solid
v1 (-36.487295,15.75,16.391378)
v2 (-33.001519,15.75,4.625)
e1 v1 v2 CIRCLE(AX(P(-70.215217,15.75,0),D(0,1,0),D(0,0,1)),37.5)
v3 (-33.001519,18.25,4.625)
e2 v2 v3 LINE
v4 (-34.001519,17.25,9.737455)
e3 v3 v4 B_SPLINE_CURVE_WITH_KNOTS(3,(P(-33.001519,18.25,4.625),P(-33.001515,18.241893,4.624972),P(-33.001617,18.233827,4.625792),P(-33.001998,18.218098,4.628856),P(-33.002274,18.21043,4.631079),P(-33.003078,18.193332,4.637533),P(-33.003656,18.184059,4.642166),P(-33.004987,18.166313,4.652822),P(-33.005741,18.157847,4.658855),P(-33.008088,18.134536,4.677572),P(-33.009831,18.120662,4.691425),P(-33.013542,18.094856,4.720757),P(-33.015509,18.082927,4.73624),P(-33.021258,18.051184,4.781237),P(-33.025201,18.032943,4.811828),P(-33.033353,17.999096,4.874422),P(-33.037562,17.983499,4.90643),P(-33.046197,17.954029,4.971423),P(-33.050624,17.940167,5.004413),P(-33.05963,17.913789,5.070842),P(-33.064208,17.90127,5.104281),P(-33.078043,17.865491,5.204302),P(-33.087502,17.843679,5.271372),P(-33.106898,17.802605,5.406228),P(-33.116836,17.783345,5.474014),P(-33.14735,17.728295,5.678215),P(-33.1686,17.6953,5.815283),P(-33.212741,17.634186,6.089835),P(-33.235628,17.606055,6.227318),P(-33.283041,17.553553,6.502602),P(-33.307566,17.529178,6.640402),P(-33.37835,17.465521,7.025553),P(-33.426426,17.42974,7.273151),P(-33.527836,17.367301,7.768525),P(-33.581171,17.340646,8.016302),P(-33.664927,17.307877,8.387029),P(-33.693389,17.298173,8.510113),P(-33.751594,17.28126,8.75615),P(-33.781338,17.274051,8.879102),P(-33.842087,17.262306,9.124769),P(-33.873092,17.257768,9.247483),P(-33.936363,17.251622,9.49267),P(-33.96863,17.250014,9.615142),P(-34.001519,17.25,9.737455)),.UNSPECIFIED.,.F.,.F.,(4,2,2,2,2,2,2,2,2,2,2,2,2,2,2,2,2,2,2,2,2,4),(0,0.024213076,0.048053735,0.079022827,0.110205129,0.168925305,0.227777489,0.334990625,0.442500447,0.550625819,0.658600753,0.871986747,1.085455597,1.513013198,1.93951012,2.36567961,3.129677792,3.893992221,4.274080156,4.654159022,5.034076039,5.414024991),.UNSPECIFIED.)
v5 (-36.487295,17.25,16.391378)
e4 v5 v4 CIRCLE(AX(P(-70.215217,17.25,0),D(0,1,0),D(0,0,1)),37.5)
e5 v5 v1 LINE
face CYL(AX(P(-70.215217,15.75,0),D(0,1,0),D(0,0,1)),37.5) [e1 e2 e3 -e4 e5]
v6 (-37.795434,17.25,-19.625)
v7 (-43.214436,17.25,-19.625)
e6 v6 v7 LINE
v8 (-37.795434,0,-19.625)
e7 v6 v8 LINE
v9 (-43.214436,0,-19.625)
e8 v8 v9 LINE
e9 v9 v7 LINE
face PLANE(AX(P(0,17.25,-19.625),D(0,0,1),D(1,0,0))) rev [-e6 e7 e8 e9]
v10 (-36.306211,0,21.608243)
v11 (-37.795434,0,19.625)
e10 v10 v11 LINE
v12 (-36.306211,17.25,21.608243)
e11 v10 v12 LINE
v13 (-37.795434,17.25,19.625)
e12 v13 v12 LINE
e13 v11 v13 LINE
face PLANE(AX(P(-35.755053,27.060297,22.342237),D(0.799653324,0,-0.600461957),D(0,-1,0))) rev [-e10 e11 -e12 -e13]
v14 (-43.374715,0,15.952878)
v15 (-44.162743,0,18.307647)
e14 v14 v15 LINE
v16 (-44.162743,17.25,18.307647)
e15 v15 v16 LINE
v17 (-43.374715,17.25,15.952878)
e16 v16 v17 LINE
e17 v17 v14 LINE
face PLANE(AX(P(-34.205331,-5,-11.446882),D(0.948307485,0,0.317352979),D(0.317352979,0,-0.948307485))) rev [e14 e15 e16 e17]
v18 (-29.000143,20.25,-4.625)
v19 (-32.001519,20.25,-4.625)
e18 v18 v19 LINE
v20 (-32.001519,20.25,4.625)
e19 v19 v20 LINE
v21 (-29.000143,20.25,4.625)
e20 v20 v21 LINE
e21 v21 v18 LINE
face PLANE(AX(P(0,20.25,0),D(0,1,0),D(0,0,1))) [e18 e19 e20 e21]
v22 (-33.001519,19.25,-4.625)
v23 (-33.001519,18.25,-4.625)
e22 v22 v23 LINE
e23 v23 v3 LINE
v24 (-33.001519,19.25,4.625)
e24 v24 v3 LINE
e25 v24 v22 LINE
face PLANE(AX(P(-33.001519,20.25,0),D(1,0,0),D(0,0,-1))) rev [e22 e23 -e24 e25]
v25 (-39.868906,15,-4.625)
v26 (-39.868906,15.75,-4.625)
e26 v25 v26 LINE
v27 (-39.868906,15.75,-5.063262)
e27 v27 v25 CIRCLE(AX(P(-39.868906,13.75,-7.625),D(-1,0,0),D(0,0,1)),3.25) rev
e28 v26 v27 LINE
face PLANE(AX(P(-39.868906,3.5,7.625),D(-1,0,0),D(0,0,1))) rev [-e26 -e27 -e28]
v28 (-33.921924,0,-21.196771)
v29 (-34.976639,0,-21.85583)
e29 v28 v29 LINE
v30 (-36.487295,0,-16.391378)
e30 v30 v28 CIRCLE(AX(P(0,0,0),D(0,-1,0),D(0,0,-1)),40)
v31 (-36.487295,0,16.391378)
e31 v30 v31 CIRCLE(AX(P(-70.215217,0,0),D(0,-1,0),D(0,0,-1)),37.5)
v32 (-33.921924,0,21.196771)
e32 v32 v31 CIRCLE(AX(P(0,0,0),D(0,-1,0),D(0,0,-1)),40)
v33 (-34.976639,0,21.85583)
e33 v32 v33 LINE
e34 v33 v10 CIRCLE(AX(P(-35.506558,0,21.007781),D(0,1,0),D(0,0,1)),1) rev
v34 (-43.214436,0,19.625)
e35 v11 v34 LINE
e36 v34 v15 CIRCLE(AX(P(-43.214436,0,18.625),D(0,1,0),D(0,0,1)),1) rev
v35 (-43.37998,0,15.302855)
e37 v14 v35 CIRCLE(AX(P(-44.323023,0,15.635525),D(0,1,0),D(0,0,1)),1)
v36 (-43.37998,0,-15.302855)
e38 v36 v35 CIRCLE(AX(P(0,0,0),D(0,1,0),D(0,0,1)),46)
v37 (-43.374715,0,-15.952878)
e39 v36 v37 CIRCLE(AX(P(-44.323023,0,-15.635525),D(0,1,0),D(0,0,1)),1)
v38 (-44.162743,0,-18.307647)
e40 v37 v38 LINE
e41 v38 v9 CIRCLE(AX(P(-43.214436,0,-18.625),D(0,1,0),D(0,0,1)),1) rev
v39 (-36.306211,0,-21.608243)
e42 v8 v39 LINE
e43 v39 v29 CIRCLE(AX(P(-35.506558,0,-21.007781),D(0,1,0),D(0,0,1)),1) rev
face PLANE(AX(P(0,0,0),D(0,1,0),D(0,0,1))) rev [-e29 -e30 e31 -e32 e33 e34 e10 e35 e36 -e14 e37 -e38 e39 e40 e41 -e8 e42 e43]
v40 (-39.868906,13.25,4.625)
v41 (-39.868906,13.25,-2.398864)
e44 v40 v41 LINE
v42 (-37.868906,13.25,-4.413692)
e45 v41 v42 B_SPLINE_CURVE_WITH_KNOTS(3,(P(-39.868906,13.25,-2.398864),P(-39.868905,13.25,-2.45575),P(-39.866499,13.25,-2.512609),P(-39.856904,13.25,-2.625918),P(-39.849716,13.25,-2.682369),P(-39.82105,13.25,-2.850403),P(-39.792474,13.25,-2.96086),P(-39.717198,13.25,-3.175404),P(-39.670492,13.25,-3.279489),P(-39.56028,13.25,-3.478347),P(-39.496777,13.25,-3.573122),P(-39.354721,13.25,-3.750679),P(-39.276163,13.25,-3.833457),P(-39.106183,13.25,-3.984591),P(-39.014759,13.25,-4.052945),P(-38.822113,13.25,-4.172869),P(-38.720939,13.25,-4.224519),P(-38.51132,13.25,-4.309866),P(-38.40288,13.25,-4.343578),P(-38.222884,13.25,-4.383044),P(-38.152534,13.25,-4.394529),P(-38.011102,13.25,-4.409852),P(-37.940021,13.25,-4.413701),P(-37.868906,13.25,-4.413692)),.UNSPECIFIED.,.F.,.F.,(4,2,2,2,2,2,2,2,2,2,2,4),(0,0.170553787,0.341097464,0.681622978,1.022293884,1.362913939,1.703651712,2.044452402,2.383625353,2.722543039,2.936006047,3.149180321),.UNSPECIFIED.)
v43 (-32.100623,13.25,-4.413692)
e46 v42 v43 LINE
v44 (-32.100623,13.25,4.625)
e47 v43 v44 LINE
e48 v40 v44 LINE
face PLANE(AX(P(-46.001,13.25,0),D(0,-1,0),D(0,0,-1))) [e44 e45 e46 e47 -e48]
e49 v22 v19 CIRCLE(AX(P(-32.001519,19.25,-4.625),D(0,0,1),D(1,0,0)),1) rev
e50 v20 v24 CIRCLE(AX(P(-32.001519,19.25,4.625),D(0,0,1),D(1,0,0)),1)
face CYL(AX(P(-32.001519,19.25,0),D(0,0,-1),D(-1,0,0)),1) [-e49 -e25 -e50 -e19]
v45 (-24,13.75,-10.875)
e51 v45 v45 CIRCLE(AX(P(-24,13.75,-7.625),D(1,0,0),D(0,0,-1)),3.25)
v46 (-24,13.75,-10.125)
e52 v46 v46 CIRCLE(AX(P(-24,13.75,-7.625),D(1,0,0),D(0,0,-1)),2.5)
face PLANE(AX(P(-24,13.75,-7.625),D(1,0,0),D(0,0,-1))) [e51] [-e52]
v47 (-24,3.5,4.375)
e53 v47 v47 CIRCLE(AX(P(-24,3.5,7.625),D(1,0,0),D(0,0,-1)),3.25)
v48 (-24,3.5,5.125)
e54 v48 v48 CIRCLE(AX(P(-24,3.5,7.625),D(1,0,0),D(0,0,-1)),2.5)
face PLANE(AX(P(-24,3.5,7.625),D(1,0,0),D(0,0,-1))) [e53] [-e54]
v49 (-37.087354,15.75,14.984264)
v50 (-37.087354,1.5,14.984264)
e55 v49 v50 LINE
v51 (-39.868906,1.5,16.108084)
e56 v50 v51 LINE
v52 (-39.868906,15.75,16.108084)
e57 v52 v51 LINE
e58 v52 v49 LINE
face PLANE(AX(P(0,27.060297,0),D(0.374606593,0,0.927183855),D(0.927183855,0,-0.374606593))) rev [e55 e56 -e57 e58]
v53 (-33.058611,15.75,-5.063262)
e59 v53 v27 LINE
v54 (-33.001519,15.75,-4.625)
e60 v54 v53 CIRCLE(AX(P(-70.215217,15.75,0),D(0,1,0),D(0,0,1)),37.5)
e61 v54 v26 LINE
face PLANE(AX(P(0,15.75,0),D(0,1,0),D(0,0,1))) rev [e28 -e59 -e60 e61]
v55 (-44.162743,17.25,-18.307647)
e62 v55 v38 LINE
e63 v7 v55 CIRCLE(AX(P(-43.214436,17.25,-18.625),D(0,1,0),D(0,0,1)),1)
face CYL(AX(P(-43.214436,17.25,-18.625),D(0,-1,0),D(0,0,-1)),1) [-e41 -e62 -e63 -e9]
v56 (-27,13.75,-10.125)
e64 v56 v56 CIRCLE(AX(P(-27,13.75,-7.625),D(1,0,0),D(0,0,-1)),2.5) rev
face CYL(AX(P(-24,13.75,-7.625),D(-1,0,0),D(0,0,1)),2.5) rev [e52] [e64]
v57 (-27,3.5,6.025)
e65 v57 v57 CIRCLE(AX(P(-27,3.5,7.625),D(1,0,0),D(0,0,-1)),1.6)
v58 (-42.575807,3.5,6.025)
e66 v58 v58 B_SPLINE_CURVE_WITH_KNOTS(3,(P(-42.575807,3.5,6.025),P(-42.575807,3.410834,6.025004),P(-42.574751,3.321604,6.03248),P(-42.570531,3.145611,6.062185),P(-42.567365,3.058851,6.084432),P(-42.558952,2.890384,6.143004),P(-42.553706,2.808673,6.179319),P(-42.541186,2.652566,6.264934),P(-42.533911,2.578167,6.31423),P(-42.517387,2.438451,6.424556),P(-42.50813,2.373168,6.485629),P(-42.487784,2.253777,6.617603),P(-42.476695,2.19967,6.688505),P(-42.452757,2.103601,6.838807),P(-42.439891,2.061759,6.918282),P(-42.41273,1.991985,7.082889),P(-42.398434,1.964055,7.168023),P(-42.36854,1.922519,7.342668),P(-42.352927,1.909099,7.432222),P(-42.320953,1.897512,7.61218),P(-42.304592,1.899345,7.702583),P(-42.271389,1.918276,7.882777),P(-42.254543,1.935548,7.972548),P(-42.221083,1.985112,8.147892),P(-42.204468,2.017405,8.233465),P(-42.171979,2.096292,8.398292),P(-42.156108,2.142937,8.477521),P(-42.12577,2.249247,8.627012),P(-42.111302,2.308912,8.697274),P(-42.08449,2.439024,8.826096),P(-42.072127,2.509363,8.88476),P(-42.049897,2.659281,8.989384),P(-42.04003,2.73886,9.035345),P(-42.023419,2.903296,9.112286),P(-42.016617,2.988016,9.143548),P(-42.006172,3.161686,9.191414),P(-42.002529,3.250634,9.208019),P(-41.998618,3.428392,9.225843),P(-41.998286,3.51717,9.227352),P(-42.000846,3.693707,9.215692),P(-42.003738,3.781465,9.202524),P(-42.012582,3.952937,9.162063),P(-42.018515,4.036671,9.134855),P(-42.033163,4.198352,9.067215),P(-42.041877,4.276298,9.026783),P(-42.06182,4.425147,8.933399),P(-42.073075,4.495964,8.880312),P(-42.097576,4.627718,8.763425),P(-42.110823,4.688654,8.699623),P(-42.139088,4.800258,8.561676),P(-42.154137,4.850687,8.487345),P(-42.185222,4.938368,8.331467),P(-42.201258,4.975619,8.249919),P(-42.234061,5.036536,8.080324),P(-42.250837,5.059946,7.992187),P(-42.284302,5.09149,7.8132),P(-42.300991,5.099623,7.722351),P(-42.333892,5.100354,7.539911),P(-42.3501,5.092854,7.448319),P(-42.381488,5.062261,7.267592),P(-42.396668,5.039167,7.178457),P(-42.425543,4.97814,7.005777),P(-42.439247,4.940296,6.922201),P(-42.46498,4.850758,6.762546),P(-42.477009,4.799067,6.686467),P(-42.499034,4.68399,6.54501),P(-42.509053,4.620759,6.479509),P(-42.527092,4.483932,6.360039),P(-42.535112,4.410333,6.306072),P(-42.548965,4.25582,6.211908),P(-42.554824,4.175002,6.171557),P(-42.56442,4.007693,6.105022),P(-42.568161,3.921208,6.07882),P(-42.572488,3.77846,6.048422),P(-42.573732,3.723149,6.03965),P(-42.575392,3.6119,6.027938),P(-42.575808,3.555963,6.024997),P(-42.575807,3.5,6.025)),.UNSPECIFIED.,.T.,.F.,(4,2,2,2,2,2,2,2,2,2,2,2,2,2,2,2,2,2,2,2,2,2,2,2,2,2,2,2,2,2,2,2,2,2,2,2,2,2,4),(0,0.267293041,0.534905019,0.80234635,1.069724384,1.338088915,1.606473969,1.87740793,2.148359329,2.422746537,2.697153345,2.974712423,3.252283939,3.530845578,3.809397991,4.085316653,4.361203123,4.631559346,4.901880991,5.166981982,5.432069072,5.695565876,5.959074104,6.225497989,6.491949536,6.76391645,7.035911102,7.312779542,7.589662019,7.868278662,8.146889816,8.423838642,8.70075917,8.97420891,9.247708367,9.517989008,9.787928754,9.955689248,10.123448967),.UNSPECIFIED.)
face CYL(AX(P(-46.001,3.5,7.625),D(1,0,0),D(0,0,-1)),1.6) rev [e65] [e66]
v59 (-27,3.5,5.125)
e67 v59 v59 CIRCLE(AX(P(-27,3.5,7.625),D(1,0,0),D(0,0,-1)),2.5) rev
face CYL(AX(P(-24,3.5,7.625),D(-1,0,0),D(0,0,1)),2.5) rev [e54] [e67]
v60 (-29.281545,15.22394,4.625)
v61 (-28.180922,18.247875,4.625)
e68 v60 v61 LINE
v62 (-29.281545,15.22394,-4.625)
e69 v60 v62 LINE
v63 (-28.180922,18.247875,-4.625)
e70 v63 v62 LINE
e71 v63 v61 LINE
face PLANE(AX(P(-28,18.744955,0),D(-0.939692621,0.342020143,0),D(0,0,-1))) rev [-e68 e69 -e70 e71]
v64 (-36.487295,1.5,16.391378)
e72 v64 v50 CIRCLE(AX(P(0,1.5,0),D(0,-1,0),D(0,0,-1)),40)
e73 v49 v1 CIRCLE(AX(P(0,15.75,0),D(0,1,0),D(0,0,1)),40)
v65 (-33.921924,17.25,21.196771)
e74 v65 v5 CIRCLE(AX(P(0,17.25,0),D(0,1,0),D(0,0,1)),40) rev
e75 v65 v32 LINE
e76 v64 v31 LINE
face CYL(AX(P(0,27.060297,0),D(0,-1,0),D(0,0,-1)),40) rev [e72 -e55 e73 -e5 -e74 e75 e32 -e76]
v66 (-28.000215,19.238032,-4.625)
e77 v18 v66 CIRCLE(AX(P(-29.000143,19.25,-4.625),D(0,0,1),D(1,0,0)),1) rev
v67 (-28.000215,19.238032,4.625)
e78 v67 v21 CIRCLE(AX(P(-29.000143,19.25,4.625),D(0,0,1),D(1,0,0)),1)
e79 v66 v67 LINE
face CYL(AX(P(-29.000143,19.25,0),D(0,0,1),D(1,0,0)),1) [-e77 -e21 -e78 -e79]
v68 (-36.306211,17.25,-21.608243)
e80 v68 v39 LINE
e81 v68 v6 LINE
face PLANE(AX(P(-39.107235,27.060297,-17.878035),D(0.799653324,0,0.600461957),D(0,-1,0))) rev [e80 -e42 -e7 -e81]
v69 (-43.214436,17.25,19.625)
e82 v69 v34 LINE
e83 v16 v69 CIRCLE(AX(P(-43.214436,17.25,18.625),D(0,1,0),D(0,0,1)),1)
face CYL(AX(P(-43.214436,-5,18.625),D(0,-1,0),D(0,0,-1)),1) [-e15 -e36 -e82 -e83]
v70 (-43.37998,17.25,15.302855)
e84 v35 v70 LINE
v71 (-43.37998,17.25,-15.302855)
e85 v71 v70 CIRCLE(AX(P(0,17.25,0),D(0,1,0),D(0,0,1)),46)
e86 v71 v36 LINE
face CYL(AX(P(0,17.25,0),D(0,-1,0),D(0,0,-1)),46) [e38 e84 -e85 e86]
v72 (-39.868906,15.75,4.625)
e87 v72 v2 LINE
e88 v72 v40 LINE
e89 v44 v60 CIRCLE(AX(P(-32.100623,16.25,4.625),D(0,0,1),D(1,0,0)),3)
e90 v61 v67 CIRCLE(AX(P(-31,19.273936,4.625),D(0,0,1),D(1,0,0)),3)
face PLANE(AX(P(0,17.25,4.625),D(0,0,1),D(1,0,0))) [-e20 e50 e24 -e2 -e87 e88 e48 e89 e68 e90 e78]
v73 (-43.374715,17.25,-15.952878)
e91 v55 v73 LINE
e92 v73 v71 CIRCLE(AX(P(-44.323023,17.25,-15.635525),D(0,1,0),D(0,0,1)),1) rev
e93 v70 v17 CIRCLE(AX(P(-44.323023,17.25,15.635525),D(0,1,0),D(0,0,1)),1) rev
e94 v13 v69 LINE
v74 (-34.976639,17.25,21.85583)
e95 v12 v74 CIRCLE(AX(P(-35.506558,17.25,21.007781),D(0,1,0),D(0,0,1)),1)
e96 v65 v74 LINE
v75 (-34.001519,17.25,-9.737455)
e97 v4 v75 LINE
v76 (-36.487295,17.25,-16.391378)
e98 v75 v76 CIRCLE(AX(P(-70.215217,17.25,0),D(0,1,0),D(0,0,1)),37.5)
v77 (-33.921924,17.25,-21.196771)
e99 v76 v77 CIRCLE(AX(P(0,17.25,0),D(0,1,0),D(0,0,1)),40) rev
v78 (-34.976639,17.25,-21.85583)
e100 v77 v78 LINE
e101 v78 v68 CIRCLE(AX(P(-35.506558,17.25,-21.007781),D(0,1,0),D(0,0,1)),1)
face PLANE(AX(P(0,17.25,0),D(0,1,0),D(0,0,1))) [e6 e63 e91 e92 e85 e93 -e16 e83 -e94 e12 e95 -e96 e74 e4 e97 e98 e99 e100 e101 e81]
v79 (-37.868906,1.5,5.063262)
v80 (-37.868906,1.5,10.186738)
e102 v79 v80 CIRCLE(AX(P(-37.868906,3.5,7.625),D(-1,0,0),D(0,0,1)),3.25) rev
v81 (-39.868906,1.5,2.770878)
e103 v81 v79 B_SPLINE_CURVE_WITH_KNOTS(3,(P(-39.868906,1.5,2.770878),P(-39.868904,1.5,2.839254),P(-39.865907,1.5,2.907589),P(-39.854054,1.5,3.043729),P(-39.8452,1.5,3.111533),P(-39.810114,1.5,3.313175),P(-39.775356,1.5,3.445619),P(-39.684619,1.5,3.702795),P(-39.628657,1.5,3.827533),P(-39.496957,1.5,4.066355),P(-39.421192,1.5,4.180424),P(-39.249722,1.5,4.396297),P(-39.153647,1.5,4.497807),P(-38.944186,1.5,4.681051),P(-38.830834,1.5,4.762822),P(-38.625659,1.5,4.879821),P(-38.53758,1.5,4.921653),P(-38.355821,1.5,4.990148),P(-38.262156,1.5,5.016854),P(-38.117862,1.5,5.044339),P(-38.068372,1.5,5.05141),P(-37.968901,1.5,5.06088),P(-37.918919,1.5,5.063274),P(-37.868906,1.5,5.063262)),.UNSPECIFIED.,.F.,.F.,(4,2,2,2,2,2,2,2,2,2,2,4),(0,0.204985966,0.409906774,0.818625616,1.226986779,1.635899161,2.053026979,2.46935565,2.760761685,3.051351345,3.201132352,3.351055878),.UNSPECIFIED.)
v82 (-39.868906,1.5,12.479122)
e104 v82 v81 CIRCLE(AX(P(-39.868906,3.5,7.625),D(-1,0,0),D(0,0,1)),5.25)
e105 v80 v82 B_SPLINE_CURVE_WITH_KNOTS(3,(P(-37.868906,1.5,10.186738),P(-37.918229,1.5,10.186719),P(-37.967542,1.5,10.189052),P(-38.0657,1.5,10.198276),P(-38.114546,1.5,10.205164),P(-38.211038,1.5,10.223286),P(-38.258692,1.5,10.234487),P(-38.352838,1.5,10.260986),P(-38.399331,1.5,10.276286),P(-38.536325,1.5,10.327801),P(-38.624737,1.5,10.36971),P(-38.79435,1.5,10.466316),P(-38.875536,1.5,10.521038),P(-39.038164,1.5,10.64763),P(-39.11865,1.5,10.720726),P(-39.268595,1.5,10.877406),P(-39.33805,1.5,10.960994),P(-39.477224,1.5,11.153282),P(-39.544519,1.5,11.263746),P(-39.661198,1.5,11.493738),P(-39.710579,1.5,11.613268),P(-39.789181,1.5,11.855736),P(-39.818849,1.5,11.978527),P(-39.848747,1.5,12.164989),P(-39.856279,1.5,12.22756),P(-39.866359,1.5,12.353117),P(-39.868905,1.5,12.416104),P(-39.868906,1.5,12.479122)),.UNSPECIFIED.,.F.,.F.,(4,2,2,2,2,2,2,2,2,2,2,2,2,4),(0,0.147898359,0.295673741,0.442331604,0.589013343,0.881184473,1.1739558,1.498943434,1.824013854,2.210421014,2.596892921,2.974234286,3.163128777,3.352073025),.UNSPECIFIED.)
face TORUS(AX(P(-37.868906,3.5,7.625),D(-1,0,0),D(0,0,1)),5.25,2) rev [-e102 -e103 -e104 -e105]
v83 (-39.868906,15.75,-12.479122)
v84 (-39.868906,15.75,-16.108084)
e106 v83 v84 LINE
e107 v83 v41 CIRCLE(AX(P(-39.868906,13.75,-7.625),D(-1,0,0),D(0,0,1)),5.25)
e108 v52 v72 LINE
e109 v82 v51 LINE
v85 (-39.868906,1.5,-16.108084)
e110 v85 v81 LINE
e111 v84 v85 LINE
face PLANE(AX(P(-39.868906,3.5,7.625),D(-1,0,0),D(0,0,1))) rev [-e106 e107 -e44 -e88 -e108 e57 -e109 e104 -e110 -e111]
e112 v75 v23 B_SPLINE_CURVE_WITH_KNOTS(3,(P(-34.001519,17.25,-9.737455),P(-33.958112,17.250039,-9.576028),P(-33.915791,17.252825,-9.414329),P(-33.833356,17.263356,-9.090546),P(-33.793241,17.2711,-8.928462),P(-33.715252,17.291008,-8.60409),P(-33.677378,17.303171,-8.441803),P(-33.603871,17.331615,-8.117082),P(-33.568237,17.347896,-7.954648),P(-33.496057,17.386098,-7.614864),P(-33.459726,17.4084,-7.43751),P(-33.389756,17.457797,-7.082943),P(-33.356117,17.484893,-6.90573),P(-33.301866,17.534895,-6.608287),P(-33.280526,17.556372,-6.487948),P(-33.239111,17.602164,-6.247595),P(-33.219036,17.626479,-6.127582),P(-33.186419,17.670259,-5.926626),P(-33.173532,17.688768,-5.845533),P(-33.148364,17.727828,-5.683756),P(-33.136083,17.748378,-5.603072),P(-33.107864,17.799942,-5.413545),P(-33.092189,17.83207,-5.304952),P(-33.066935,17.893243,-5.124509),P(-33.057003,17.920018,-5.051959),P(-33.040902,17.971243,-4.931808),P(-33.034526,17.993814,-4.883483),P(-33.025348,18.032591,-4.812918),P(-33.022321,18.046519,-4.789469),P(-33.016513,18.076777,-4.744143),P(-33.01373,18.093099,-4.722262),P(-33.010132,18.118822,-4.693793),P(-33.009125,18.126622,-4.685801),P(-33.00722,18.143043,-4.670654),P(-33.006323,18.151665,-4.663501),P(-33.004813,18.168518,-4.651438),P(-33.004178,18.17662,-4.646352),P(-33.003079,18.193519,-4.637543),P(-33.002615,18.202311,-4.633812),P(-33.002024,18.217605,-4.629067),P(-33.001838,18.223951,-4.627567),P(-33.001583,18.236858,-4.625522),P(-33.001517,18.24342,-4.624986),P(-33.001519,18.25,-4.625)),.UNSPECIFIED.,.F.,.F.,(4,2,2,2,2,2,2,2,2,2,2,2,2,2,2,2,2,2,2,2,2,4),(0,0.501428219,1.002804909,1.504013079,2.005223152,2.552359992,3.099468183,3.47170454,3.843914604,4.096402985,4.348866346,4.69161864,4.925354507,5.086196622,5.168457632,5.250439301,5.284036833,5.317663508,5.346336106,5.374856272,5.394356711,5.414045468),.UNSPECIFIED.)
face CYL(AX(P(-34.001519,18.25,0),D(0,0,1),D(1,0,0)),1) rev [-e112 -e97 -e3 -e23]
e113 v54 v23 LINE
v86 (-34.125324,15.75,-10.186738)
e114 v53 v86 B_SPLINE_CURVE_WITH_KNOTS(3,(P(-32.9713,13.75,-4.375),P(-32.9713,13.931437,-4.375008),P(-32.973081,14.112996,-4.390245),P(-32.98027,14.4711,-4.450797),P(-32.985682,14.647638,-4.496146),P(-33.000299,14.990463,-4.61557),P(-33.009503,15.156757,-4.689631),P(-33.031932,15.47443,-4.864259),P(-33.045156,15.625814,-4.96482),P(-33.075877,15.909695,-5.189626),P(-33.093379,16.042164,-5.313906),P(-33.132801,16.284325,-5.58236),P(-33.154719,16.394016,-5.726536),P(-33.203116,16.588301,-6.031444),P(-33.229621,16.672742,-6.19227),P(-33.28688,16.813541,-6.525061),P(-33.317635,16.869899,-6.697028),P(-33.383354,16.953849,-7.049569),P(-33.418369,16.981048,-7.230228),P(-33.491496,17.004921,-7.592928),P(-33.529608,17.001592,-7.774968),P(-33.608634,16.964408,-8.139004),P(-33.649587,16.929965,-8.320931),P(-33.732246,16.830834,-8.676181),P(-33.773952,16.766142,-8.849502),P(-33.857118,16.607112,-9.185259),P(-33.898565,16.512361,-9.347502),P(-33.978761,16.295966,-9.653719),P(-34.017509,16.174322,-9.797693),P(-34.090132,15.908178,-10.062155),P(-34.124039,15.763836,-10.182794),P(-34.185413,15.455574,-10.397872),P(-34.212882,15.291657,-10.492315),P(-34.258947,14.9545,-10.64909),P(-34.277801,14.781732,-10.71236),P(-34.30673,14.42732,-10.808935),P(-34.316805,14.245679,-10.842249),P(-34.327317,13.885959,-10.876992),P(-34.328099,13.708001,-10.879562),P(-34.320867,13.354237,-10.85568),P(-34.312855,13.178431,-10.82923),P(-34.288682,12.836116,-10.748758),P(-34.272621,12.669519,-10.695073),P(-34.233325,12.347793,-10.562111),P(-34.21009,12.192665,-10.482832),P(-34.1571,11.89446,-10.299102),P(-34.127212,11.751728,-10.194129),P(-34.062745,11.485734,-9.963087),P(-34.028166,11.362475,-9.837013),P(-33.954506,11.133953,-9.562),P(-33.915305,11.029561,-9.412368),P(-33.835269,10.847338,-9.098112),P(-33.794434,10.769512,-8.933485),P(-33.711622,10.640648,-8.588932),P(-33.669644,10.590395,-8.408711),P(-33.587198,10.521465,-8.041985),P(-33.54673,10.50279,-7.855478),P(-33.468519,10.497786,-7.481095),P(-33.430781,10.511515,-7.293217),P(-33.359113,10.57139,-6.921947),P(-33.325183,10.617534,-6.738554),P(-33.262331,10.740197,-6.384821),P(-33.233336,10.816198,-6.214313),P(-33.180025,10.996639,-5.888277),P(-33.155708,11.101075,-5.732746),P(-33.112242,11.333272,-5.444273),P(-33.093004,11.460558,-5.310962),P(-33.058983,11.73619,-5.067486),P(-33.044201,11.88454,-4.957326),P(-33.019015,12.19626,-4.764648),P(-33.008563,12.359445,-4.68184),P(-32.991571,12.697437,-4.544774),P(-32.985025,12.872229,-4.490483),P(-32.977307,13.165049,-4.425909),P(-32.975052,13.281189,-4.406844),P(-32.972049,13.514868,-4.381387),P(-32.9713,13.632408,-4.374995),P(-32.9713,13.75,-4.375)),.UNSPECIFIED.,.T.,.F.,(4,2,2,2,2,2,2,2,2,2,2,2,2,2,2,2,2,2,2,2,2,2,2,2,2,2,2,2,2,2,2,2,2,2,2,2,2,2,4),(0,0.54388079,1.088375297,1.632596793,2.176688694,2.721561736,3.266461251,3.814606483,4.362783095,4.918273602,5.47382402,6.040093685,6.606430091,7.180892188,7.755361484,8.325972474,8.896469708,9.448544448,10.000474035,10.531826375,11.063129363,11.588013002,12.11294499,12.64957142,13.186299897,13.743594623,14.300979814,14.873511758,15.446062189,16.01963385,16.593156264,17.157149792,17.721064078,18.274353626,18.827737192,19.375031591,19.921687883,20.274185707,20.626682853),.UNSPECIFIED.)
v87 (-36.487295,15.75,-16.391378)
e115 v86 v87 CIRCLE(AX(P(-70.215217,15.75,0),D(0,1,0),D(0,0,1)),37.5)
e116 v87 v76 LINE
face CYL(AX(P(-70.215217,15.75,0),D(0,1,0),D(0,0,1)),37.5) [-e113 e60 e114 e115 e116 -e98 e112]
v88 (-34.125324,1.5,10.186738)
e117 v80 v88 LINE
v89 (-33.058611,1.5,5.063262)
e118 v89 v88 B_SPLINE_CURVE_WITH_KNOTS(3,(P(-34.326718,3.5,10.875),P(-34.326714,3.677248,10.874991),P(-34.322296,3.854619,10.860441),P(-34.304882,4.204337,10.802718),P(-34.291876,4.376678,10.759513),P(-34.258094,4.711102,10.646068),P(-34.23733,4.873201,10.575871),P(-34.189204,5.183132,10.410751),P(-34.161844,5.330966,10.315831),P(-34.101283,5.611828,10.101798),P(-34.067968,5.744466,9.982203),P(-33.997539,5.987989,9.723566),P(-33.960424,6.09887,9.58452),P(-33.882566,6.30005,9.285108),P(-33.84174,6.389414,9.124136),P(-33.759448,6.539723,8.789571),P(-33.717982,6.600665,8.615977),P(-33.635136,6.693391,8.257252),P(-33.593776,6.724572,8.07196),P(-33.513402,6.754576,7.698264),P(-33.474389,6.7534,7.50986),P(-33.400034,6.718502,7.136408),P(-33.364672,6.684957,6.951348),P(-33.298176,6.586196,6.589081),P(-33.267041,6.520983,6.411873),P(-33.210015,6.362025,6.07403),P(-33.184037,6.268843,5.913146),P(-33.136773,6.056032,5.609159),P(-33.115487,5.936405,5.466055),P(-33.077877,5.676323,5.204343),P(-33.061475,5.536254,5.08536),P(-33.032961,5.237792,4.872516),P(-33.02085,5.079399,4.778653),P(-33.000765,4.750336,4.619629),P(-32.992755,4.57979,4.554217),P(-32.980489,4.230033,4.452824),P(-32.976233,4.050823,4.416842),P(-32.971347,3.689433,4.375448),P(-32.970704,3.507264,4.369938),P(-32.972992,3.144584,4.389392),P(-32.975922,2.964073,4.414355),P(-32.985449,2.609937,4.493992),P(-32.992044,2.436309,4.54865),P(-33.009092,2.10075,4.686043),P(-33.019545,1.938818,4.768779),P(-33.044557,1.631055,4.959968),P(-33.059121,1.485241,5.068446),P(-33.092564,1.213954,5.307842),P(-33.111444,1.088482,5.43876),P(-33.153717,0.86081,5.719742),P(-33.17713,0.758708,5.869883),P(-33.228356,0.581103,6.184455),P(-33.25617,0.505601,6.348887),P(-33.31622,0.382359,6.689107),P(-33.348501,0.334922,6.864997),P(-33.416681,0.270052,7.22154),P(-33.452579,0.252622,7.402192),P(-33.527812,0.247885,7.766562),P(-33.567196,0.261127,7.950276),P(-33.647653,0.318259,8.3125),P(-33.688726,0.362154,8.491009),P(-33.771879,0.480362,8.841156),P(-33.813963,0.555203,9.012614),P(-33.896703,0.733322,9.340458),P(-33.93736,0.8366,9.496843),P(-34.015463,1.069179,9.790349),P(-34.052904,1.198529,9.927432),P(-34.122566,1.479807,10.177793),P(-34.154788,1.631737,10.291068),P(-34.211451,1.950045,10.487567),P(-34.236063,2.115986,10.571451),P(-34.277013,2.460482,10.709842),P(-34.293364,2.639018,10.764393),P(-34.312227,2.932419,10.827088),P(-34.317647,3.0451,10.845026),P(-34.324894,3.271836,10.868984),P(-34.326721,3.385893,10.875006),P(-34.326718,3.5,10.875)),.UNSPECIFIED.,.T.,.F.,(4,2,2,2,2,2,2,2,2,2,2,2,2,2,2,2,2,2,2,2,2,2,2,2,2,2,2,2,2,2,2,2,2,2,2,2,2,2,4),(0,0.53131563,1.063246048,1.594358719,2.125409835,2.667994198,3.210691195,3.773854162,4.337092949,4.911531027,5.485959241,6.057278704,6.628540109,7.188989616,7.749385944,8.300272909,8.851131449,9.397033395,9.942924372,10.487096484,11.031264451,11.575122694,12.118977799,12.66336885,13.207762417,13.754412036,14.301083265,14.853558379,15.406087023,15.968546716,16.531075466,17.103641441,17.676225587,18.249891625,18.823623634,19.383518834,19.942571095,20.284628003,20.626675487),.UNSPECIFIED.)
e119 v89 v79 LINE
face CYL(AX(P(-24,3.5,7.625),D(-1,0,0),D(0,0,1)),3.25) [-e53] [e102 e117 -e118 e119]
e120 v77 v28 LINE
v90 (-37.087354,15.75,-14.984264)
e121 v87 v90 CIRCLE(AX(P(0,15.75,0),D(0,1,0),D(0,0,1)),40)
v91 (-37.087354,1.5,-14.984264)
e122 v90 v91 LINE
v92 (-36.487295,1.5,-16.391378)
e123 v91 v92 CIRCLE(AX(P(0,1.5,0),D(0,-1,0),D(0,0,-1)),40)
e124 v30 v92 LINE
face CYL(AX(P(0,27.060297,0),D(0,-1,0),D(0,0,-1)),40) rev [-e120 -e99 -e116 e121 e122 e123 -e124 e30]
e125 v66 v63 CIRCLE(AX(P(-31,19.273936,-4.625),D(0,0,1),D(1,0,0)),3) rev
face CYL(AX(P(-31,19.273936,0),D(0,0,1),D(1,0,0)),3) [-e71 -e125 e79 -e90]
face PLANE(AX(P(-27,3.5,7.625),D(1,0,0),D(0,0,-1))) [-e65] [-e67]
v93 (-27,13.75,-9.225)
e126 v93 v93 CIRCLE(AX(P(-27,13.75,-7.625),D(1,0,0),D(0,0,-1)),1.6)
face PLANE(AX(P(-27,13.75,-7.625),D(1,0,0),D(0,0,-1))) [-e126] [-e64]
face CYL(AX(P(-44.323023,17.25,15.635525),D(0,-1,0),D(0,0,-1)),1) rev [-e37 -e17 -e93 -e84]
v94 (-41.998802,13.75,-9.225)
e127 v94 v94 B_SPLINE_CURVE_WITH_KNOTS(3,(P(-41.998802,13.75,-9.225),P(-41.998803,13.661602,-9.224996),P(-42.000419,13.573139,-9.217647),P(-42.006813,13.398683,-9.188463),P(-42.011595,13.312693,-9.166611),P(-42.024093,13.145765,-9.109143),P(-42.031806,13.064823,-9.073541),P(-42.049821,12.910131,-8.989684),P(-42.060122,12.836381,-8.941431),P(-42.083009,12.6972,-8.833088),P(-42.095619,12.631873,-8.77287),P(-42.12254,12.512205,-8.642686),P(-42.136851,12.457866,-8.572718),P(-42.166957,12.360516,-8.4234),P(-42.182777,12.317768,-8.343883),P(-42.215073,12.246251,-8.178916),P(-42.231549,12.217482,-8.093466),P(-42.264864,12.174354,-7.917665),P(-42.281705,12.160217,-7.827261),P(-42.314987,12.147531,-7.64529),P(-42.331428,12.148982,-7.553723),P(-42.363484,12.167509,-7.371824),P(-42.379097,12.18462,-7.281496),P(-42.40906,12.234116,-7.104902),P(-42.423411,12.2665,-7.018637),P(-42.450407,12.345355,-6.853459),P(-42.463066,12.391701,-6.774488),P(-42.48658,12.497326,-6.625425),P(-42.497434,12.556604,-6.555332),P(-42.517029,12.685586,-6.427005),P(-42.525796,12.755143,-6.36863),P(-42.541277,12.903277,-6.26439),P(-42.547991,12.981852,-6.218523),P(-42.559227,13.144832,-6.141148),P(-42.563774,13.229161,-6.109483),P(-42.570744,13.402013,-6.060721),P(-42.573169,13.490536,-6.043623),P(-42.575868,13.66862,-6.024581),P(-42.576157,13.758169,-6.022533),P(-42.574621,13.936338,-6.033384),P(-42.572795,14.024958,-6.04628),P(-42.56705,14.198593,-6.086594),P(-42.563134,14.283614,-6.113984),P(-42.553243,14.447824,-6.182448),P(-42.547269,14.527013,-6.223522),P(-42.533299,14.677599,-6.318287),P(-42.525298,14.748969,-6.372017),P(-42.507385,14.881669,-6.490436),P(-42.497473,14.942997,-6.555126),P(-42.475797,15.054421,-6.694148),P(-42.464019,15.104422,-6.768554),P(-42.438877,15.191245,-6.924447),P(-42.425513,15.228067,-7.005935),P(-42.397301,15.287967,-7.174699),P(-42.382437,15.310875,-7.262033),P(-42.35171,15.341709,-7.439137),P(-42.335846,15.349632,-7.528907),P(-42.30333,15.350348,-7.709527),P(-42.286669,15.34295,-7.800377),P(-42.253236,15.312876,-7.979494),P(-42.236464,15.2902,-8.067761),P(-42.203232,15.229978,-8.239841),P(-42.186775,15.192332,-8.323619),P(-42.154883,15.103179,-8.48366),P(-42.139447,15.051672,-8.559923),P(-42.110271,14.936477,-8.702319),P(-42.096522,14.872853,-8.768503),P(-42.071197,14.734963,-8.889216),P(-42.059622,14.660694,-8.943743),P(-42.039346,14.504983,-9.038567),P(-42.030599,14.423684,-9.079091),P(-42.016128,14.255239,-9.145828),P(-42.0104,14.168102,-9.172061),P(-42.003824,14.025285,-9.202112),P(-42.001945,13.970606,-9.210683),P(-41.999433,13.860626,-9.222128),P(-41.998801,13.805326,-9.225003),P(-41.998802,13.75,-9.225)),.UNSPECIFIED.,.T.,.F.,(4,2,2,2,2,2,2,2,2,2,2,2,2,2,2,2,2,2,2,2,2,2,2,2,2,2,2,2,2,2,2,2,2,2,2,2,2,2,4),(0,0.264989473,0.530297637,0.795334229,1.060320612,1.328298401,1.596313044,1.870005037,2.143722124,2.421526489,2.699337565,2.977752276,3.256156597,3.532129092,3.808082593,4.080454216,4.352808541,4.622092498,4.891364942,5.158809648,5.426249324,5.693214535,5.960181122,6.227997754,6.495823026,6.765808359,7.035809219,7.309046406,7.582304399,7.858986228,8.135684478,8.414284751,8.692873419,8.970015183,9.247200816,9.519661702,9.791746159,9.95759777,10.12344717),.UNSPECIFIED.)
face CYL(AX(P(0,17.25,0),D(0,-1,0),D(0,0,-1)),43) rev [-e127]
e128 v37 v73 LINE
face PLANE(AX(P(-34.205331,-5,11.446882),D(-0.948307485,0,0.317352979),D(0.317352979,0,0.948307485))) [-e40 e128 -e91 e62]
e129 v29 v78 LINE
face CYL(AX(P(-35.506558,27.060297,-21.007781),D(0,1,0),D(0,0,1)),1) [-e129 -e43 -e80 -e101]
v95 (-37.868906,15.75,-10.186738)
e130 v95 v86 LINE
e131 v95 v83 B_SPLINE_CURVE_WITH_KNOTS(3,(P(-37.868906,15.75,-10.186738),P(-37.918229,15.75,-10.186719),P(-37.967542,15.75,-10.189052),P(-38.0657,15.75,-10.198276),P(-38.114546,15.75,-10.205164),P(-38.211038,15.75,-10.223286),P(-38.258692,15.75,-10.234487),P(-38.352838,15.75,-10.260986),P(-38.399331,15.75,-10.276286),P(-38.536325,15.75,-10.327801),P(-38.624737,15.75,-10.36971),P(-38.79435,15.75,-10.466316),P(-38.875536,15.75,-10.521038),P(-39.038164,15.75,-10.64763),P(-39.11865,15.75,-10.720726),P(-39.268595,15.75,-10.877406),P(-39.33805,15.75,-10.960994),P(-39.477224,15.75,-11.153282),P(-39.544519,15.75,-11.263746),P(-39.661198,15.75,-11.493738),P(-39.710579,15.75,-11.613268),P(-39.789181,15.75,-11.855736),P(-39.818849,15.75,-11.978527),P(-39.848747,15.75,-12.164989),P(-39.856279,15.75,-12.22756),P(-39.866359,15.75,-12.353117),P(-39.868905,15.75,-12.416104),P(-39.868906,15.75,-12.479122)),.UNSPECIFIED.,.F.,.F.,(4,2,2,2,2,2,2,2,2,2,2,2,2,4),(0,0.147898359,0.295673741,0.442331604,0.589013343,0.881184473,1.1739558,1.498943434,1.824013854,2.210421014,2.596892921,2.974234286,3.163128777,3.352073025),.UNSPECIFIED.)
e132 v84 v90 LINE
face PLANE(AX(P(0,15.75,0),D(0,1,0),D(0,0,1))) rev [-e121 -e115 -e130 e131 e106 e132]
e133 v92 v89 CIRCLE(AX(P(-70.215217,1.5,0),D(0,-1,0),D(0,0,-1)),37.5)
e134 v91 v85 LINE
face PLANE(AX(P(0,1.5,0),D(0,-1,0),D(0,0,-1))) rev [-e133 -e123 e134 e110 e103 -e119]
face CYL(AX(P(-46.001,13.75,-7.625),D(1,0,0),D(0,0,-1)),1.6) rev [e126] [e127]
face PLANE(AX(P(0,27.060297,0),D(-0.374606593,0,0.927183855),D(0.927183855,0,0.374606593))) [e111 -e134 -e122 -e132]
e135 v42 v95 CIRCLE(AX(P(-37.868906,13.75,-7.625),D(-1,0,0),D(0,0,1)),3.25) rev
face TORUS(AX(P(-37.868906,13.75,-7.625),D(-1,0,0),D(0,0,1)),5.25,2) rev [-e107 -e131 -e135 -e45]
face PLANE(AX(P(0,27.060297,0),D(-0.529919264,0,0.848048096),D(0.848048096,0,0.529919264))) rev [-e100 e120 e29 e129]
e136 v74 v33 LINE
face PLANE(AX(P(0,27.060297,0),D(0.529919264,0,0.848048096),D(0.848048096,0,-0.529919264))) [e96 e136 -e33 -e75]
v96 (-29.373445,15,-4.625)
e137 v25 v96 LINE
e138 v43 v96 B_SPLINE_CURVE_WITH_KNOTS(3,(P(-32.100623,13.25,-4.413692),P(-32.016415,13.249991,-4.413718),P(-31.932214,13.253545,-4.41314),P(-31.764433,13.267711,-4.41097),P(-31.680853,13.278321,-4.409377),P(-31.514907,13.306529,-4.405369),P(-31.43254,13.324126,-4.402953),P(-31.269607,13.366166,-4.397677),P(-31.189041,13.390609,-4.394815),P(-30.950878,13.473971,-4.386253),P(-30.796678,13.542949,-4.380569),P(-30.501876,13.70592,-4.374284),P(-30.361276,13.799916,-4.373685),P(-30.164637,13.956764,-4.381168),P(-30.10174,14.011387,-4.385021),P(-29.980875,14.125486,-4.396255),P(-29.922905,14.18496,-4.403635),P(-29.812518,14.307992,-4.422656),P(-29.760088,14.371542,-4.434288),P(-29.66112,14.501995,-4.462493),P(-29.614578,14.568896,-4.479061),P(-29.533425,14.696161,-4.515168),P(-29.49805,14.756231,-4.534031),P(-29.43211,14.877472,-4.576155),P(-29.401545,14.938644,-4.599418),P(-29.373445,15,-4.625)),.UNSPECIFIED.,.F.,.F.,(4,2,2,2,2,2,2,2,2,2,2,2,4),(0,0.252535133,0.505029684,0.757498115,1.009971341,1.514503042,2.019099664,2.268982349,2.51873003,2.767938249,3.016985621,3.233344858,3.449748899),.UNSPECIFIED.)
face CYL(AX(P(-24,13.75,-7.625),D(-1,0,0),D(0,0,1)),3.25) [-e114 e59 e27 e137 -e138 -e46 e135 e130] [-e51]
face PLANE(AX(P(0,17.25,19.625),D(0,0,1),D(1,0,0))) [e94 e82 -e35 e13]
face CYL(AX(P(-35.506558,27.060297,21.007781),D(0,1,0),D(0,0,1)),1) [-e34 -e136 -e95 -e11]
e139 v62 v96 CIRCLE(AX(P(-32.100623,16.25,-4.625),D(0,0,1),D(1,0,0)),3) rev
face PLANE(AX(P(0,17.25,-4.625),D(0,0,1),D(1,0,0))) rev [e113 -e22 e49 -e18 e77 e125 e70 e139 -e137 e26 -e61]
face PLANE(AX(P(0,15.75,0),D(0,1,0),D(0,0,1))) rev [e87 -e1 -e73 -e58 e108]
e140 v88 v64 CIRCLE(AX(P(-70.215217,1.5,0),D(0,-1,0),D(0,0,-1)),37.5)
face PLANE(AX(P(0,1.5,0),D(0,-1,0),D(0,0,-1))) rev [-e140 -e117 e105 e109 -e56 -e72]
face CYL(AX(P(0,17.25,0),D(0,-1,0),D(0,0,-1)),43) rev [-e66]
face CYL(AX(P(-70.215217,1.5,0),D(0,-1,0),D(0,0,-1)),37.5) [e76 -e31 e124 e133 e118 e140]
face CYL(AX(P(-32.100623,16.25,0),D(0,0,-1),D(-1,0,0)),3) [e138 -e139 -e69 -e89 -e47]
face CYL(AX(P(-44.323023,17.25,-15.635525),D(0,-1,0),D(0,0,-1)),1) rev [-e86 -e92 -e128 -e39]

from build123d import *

# Parameters (mm, degrees)
BOSS_EXTRUDE1_DEPTH              = 17.25
CUT_EXTRUDE1_REACH               = 33.729
CUT_EXTRUDE1_END_RADIUS          = 43
SKETCH2_W                        = 9.25
SKETCH2_H                        = 13.25
BOSS_EXTRUDE2_REACH              = 33.729
BOSS_EXTRUDE2_END_RADIUS         = 43
SKETCH4_R                        = 2.5
SKETCH4_R_2                      = 1.6
BOSS_EXTRUDE3_DEPTH              = 1.5
BOSS_EXTRUDE4_START              = -1.5
BOSS_EXTRUDE4_DEPTH              = 1.5
SKETCH9_W                        = 5.001518559
SKETCH9_H                        = 9.25
BOSS_EXTRUDE5_DEPTH              = 3
CHAMFER1_SIZE                    = 2
CHAMFER1_SIZE2                   = 5.494954839
FILLET1_R                        = 3
FILLET2_R                        = 1
FILLET3_R                        = 1
BOSS_EXTRUDE8_REACH              = 55.956
CHAMFER2_START                   = -1
CHAMFER2_DEPTH                   = 19
FILLET5_R                        = 1
BOSS_EXTRUDE9_REACH              = 34.176
BOSS_EXTRUDE10_START             = 1
SKETCH15_R                       = 2.5
SKETCH15_R_2                     = 1.6
BOSS_EXTRUDE10_DEPTH             = 1
BOSS_EXTRUDE11_REACH             = 37.432
SKETCH16_R                       = 3.25
SKETCH16_R_2                     = 2.5
BOSS_EXTRUDE11_DIRECTION_2_DEPTH = 3
FILLET6_R                        = 2
BOSS_EXTRUDE12_START             = -17.25
BOSS_EXTRUDE12_DEPTH             = 17.25
FILLET7_R                        = 1


with BuildPart() as part:
    # Sketch1 → Boss-Extrude1 (new body)
    with BuildSketch(Plane(origin=(0, 0, 0), x_dir=(1, 0, 0), z_dir=(0, 1, 0))):
        with BuildLine():
            ThreePointArc((-42.750548242, 4.625), (-41.193980767, 12.331096812), (-38.260415249, 19.625))
            Line((-38.260415249, 19.625), (-41.603598102, 19.625))
            ThreePointArc((-41.603598102, 19.625), (-46, 0), (-41.603598102, -19.625))
            Line((-41.603598102, -19.625), (-38.260415249, -19.625))
            ThreePointArc((-38.260415249, -19.625), (-41.193980767, -12.331096812), (-42.750548242, -4.625))
            Line((-42.750548242, -4.625), (-28, -4.625))
            Line((-28, -4.625), (-28, 4.625))
            Line((-28, 4.625), (-42.750548242, 4.625))
        make_face()
    extrude(amount=BOSS_EXTRUDE1_DEPTH)

    # Cut-Extrude1: up to this cylinder (the profile starts inside it)
    cut_extrude1_end = Plane(origin=(0, 6.625, 0), z_dir=(0, -1, 0)) * Cylinder(CUT_EXTRUDE1_END_RADIUS, 154.458, mode=Mode.PRIVATE)
    # Sketch2 → Cut-Extrude1 (cut, up to the surface)
    with BuildSketch(Plane(origin=(-28, 0, 0), x_dir=(0, 0, -1), z_dir=(1, 0, 0)), mode=Mode.PRIVATE) as cut_extrude1_sk1:
        with Locations((0, 6.625)):
            Rectangle(SKETCH2_W, SKETCH2_H)
    cut_extrude1_tool1 = extrude(cut_extrude1_sk1.sketch, amount=-CUT_EXTRUDE1_REACH, mode=Mode.PRIVATE) & cut_extrude1_end
    add(cut_extrude1_tool1.solids().sort_by_distance((-28, 6.625, 0))[0], mode=Mode.SUBTRACT)

    # Boss-Extrude2: up to this cylinder (the profile starts inside it)
    boss_extrude2_end = Plane(origin=(0, 8.625, 0), z_dir=(0, -1, 0)) * Cylinder(BOSS_EXTRUDE2_END_RADIUS, 164.708, mode=Mode.PRIVATE)
    # Sketch4 → Boss-Extrude2 (add, up to the surface)
    with BuildSketch(Plane(origin=(-28, 0, 0), x_dir=(0, 0, -1), z_dir=(1, 0, 0)), mode=Mode.PRIVATE) as boss_extrude2_sk1:
        with Locations((-7.625, 3.5)):
            Circle(SKETCH4_R)
        with Locations((-7.625, 3.5)):
            Circle(SKETCH4_R_2, mode=Mode.SUBTRACT)
    boss_extrude2_tool1 = extrude(boss_extrude2_sk1.sketch, amount=-BOSS_EXTRUDE2_REACH, mode=Mode.PRIVATE) & boss_extrude2_end
    add(boss_extrude2_tool1.solids().sort_by_distance((-28, 3.5, 10.054289))[0])
    # Sketch4 → Boss-Extrude2 (add, up to the surface)
    with BuildSketch(Plane(origin=(-28, 0, 0), x_dir=(0, 0, -1), z_dir=(1, 0, 0)), mode=Mode.PRIVATE) as boss_extrude2_sk2:
        with Locations((7.625, 13.75)):
            Circle(SKETCH4_R)
        with Locations((7.625, 13.75)):
            Circle(SKETCH4_R_2, mode=Mode.SUBTRACT)
    boss_extrude2_tool2 = extrude(boss_extrude2_sk2.sketch, amount=-BOSS_EXTRUDE2_REACH, mode=Mode.PRIVATE) & boss_extrude2_end
    add(boss_extrude2_tool2.solids().sort_by_distance((-28, 13.75, -5.195711))[0])

    # Sketch7 → Boss-Extrude3 (add)
    with BuildSketch(Plane.XZ):
        with BuildLine():
            ThreePointArc((-38.260415249, 19.625), (-43, 0), (-38.260415249, -19.625))
            ThreePointArc((-38.260415249, -19.625), (-34.128134601, -10.196688741), (-32.715217313, 0))
            ThreePointArc((-32.715217313, 0), (-34.128134601, 10.196688741), (-38.260415249, 19.625))
        make_face()
    extrude(amount=-BOSS_EXTRUDE3_DEPTH)

    # Sketch8 → Boss-Extrude4 (add)
    with BuildSketch(Plane(origin=(0, 17.25, 0), x_dir=(1, 0, 0), z_dir=(0, 1, 0)).offset(BOSS_EXTRUDE4_START)):
        with BuildLine():
            Line((-42.750548242, 4.625), (-33.001518559, 4.625))
            ThreePointArc((-33.001518559, 4.625), (-34.827078391, 12.406837776), (-38.260415249, 19.625))
            ThreePointArc((-38.260415249, 19.625), (-41.193980767, 12.331096812), (-42.750548242, 4.625))
        make_face()
        with BuildLine():
            ThreePointArc((-38.260415249, -19.625), (-34.827078391, -12.406837776), (-33.001518559, -4.625))
            Line((-33.001518559, -4.625), (-42.750548242, -4.625))
            ThreePointArc((-42.750548242, -4.625), (-41.193980767, -12.331096812), (-38.260415249, -19.625))
        make_face()
    extrude(amount=BOSS_EXTRUDE4_DEPTH)

    # Sketch9 → Boss-Extrude5 (add)
    with BuildSketch(Plane(origin=(0, 17.25, 0), x_dir=(1, 0, 0), z_dir=(0, 1, 0))):
        with Locations((-30.50075928, 0)):
            Rectangle(SKETCH9_W, SKETCH9_H)
    extrude(amount=BOSS_EXTRUDE5_DEPTH)

    # Chamfer1
    chamfer1_edges = [part.edges().sort_by_distance(p)[0] for p in [
        (-28, 13.25, 0),
    ]]
    chamfer1_side = [part.faces().sort_by_distance(p)[0] for p in [
        (-35.458658311, 13.25, 0),
    ]]
    chamfer(chamfer1_edges, length=CHAMFER1_SIZE, length2=CHAMFER1_SIZE2, reference=chamfer1_side[0])

    # Fillet1
    fillet1_edges = [part.edges().sort_by_distance(p)[0] for p in [
        (-28, 18.744954839, 0),
        (-30, 13.25, 0),
    ]]
    fillet(fillet1_edges, radius=FILLET1_R)

    # Fillet2
    fillet2_edges = [part.edges().sort_by_distance(p)[0] for p in [
        (-28, 20.25, 0),
    ]]
    fillet(fillet2_edges, radius=FILLET2_R)

    # Fillet3
    # the kernel refuses this fillet: 1 mm, written as the material it adds along each edge
    with BuildSketch(Plane(origin=(-33.001518559, 17.25, -12.125), x_dir=(0, 1, 0), z_dir=(0, 0, 1))) as fillet3_piece_1_section:
        with BuildLine():
            CenterArc((FILLET3_R, FILLET3_R), FILLET3_R, 180, 90)
            Line((0, FILLET3_R), (0, 0))
            Line((0, 0), (FILLET3_R, 0))
        make_face()
    fillet3_piece_1 = extrude(amount=24.25, mode=Mode.PRIVATE)
    fillet3_piece_1 = fillet3_piece_1 & Plane(origin=(-70.215217313, 17.25, 0), x_dir=(0.8521280550611038, 0, 0.5233333333333359), z_dir=(0, -1, 0)) * Cylinder(37.5, 53, mode=Mode.PRIVATE)
    add(fillet3_piece_1)
    # the kernel refuses this fillet: 1 mm, written as the material it takes off along each edge
    with BuildSketch(Plane(origin=(-33.001518559, 20.25, -7.125), x_dir=(1, 0, 0), z_dir=(0, 0, 1))) as fillet3_2_piece_1:
        with BuildLine():
            CenterArc((FILLET3_R, -FILLET3_R), FILLET3_R, 90, 90)
            Line((0, -FILLET3_R), (0, 0))
            Line((0, 0), (FILLET3_R, 0))
        make_face()
    extrude(amount=14.25, mode=Mode.SUBTRACT)

    # Boss-Extrude8: up to this face of the body (flat: up to its plane)
    boss_extrude8_end = Plane(part.part.faces().sort_by_distance((-39.752003107, 17.25, 0))[0])
    # Sketch12 → Boss-Extrude8 (add, up to the picked face)
    with BuildSketch(Plane.XZ, mode=Mode.PRIVATE) as boss_extrude8_sk1:
        with BuildLine():
            ThreePointArc((-36.466068135, 22.786528362), (-37.39666623, 21.224734507), (-38.260415249, 19.625))
            ThreePointArc((-38.260415249, 19.625), (-37.334080823, 18.029998977), (-36.487295336, 16.391378193))
            ThreePointArc((-36.487295336, 16.391378193), (-35.286505713, 18.837794844), (-33.921923846, 21.196770569))
            Line((-33.921923846, 21.196770569), (-36.466068135, 22.786528362))
        make_face()
    boss_extrude8_tool1 = split(extrude(boss_extrude8_sk1.sketch, amount=-BOSS_EXTRUDE8_REACH, mode=Mode.PRIVATE), bisect_by=boss_extrude8_end, keep=Keep.BOTH, mode=Mode.PRIVATE)
    # Sketch12 → Boss-Extrude8 (add, up to the picked face)
    with BuildSketch(Plane.XZ, mode=Mode.PRIVATE) as boss_extrude8_sk2:
        with BuildLine():
            ThreePointArc((-36.487295336, 16.391378193), (-37.334080823, 18.029998977), (-38.260415249, 19.625))
            ThreePointArc((-38.260415249, 19.625), (-39.104218125, 17.884633763), (-39.868905746, 16.108083517))
            Line((-39.868905746, 16.108083517), (-37.087354183, 14.984263737))
            ThreePointArc((-37.087354183, 14.984263737), (-36.794051907, 15.690689733), (-36.487295336, 16.391378193))
        make_face()
    boss_extrude8_tool2 = split(extrude(boss_extrude8_sk2.sketch, amount=-BOSS_EXTRUDE8_REACH, mode=Mode.PRIVATE), bisect_by=boss_extrude8_end, keep=Keep.BOTH, mode=Mode.PRIVATE)
    # Sketch12 → Boss-Extrude8 (add, up to the picked face)
    with BuildSketch(Plane.XZ, mode=Mode.PRIVATE) as boss_extrude8_sk3:
        with BuildLine():
            Line((-37.087354183, -14.984263737), (-39.868905746, -16.108083517))
            ThreePointArc((-39.868905746, -16.108083517), (-39.104218125, -17.884633763), (-38.260415249, -19.625))
            ThreePointArc((-38.260415249, -19.625), (-37.334080823, -18.029998977), (-36.487295336, -16.391378193))
            ThreePointArc((-36.487295336, -16.391378193), (-36.794051907, -15.690689733), (-37.087354183, -14.984263737))
        make_face()
    boss_extrude8_tool3 = split(extrude(boss_extrude8_sk3.sketch, amount=-BOSS_EXTRUDE8_REACH, mode=Mode.PRIVATE), bisect_by=boss_extrude8_end, keep=Keep.BOTH, mode=Mode.PRIVATE)
    # Sketch12 → Boss-Extrude8 (add, up to the picked face)
    with BuildSketch(Plane.XZ, mode=Mode.PRIVATE) as boss_extrude8_sk4:
        with BuildLine():
            ThreePointArc((-36.487295336, -16.391378193), (-37.334080823, -18.029998977), (-38.260415249, -19.625))
            ThreePointArc((-38.260415249, -19.625), (-37.39666623, -21.224734507), (-36.466068135, -22.786528362))
            Line((-36.466068135, -22.786528362), (-33.921923846, -21.196770569))
            ThreePointArc((-33.921923846, -21.196770569), (-35.286505713, -18.837794844), (-36.487295336, -16.391378193))
        make_face()
    boss_extrude8_tool4 = split(extrude(boss_extrude8_sk4.sketch, amount=-BOSS_EXTRUDE8_REACH, mode=Mode.PRIVATE), bisect_by=boss_extrude8_end, keep=Keep.BOTH, mode=Mode.PRIVATE)
    add(boss_extrude8_tool1.solids().sort_by(Axis((-36.243564, 0, 19.961261), (0, 1, 0)))[0])
    add(boss_extrude8_tool2.solids().sort_by(Axis((-38.098246, 0, 16.960588), (0, 1, 0)))[0])
    add(boss_extrude8_tool3.solids().sort_by(Axis((-38.098246, 0, -16.960588), (0, 1, 0)))[0])
    add(boss_extrude8_tool4.solids().sort_by(Axis((-36.243564, 0, -19.961261), (0, 1, 0)))[0])

    # Chamfer2: read off the stored shape, not the designer's step
    # Chamfer2 outline → Chamfer2 (cut)
    with BuildSketch(Plane(origin=(0, 0, 0), x_dir=(1, 0, 0), z_dir=(0, 1, 0)).offset(CHAMFER2_START)):
        with BuildLine():
            ThreePointArc((-36.466068135, 22.786528362), (-37.39666623, 21.224734507), (-38.260415249, 19.625))
            Line((-38.260415249, 19.625), (-37.795434487, 19.625))
            Line((-37.795434487, 19.625), (-35.755053439, 22.34223707))
            Line((-35.755053439, 22.34223707), (-36.466068135, 22.786528362))
        make_face()
        with BuildLine():
            Line((-37.795434487, -19.625), (-38.260415249, -19.625))
            ThreePointArc((-38.260415249, -19.625), (-37.39666623, -21.224734507), (-36.466068135, -22.786528362))
            Line((-36.466068135, -22.786528362), (-35.755053439, -22.34223707))
            Line((-35.755053439, -22.34223707), (-37.795434487, -19.625))
        make_face()
    extrude(amount=CHAMFER2_DEPTH, mode=Mode.SUBTRACT)

    # Fillet5
    fillet5_edges = [part.edges().sort_by_distance(p)[0] for p in [
        (-35.755053439, 8.625, -22.34223707),
        (-35.755053439, 8.625, 22.34223707),
    ]]
    fillet(fillet5_edges, radius=FILLET5_R)

    # Sketch14 → Boss-Extrude9 (add, up to next)
    with BuildSketch(Plane.ZY.offset(39.868905746), mode=Mode.PRIVATE) as boss_extrude9_sk1:
        with BuildLine():
            Line((-16.108083517, 15.75), (-16.108083517, 1.5))
            Line((-16.108083517, 1.5), (6.125, 1.5))
            ThreePointArc((6.125, 1.5), (7.625, 6), (9.125, 1.5))
            Line((9.125, 1.5), (16.108083517, 1.5))
            Line((16.108083517, 1.5), (16.108083517, 15.75))
            Line((16.108083517, 15.75), (4.625, 15.75))
            Line((4.625, 15.75), (4.625, 13.25))
            Line((4.625, 13.25), (-4.625, 13.25))
            Line((-4.625, 13.25), (-4.625, 15.75))
            Line((-4.625, 15.75), (-6.125, 15.75))
            ThreePointArc((-6.125, 15.75), (-7.625, 11.25), (-9.125, 15.75))
            Line((-9.125, 15.75), (-16.108083517, 15.75))
        make_face()
    boss_extrude9_tool1 = extrude(boss_extrude9_sk1.sketch, amount=BOSS_EXTRUDE9_REACH, mode=Mode.PRIVATE) - part.part
    add(boss_extrude9_tool1.solids().sort_by_distance((-39.868906, 8.284269, 0))[0])

    # Sketch15 → Boss-Extrude10 (add)
    # profile 1 of 2: a face of its own
    with BuildSketch(Plane(origin=(-28, 0, 0), x_dir=(0, 0, -1), z_dir=(1, 0, 0)).offset(BOSS_EXTRUDE10_START)):
        with Locations((-7.625, 3.5)):
            Circle(SKETCH15_R)
        with Locations((-7.625, 3.5)):
            Circle(SKETCH15_R_2, mode=Mode.SUBTRACT)
    # profile 2 of 2: a face of its own
    with BuildSketch(Plane(origin=(-28, 0, 0), x_dir=(0, 0, -1), z_dir=(1, 0, 0)).offset(BOSS_EXTRUDE10_START)):
        with Locations((7.625, 13.75)):
            Circle(SKETCH15_R)
        with Locations((7.625, 13.75)):
            Circle(SKETCH15_R_2, mode=Mode.SUBTRACT)
    extrude(amount=-BOSS_EXTRUDE10_DEPTH)

    # Boss-Extrude11: up to this face of the body (flat: up to its plane)
    boss_extrude11_end = Plane(part.part.faces().sort_by_distance((-39.868905746, 8.284269091, 0))[0])
    # Sketch16 → Boss-Extrude11 (add, up to the picked face)
    with BuildSketch(Plane(origin=(-27, 0, 0), x_dir=(0, 0, -1), z_dir=(1, 0, 0)), mode=Mode.PRIVATE) as boss_extrude11_sk1:
        with Locations(Location((7.625, 13.75, 0), (0, 0, 188.849883098))):
            Circle(SKETCH16_R)
        with Locations((7.625, 13.75)):
            Circle(SKETCH16_R_2, mode=Mode.SUBTRACT)
    boss_extrude11_tool1 = split(extrude(boss_extrude11_sk1.sketch, amount=-BOSS_EXTRUDE11_REACH, mode=Mode.PRIVATE), bisect_by=boss_extrude11_end, keep=Keep.BOTH, mode=Mode.PRIVATE)
    # Sketch16 → Boss-Extrude11 (add, up to the picked face)
    with BuildSketch(Plane(origin=(-27, 0, 0), x_dir=(0, 0, -1), z_dir=(1, 0, 0)), mode=Mode.PRIVATE) as boss_extrude11_sk2:
        with Locations(Location((-7.625, 3.5, 0), (0, 0, 217.979872445))):
            Circle(SKETCH16_R)
        with Locations((-7.625, 3.5)):
            Circle(SKETCH16_R_2, mode=Mode.SUBTRACT)
    boss_extrude11_tool2 = split(extrude(boss_extrude11_sk2.sketch, amount=-BOSS_EXTRUDE11_REACH, mode=Mode.PRIVATE), bisect_by=boss_extrude11_end, keep=Keep.BOTH, mode=Mode.PRIVATE)
    add(boss_extrude11_tool1.solids().sort_by(Axis((-27, 14.235858, -10.745479), (-1, 0, 0)))[0])
    add(boss_extrude11_tool2.solids().sort_by(Axis((-27, 5.443431, 5.135719), (-1, 0, 0)))[0])

    # Sketch16 → Boss-Extrude11 direction 2 (add)
    # profile 1 of 2: a face of its own
    with BuildSketch(Plane(origin=(-27, 0, 0), x_dir=(0, 0, -1), z_dir=(1, 0, 0))):
        with Locations(Location((7.625, 13.75, 0), (0, 0, 188.849883098))):
            Circle(SKETCH16_R)
        with Locations((7.625, 13.75)):
            Circle(SKETCH16_R_2, mode=Mode.SUBTRACT)
    # profile 2 of 2: a face of its own
    with BuildSketch(Plane(origin=(-27, 0, 0), x_dir=(0, 0, -1), z_dir=(1, 0, 0))):
        with Locations(Location((-7.625, 3.5, 0), (0, 0, 217.979872445))):
            Circle(SKETCH16_R)
        with Locations((-7.625, 3.5)):
            Circle(SKETCH16_R_2, mode=Mode.SUBTRACT)
    extrude(amount=BOSS_EXTRUDE11_DIRECTION_2_DEPTH)

    # Fillet6
    fillet6_edges = [part.edges().sort_by_distance(p)[0] for p in [
        (-39.868905746, 10.767632726, -8.916505108),
        (-39.868905746, 6.75, 7.625),
    ]]
    fillet(fillet6_edges, radius=FILLET6_R)

    # Sketch17 → Boss-Extrude12 (add)
    with BuildSketch(Plane(origin=(0, 17.25, 0), x_dir=(1, 0, 0), z_dir=(0, 1, 0)).offset(BOSS_EXTRUDE12_START)):
        with BuildLine():
            ThreePointArc((-43.264990177, 15.625), (-42.481399684, 17.644565195), (-41.603598102, 19.625))
            Line((-41.603598102, 19.625), (-44.603598102, 19.625))
            Line((-44.603598102, 19.625), (-43.264990177, 15.625))
        make_face()
        with BuildLine():
            ThreePointArc((-41.603598102, -19.625), (-42.481399684, -17.644565195), (-43.264990177, -15.625))
            Line((-43.264990177, -15.625), (-44.603598102, -19.625))
            Line((-44.603598102, -19.625), (-41.603598102, -19.625))
        make_face()
    extrude(amount=BOSS_EXTRUDE12_DEPTH)

    # Fillet7
    fillet7_edges = [part.edges().sort_by_distance(p)[0] for p in [
        (-44.603598102, 8.625, -19.625),
        (-43.264990177, 8.625, -15.625),
        (-44.603598102, 8.625, 19.625),
        (-43.264990177, 8.625, 15.625),
    ]]
    fillet(fillet7_edges, radius=FILLET7_R)


solid = part.part
